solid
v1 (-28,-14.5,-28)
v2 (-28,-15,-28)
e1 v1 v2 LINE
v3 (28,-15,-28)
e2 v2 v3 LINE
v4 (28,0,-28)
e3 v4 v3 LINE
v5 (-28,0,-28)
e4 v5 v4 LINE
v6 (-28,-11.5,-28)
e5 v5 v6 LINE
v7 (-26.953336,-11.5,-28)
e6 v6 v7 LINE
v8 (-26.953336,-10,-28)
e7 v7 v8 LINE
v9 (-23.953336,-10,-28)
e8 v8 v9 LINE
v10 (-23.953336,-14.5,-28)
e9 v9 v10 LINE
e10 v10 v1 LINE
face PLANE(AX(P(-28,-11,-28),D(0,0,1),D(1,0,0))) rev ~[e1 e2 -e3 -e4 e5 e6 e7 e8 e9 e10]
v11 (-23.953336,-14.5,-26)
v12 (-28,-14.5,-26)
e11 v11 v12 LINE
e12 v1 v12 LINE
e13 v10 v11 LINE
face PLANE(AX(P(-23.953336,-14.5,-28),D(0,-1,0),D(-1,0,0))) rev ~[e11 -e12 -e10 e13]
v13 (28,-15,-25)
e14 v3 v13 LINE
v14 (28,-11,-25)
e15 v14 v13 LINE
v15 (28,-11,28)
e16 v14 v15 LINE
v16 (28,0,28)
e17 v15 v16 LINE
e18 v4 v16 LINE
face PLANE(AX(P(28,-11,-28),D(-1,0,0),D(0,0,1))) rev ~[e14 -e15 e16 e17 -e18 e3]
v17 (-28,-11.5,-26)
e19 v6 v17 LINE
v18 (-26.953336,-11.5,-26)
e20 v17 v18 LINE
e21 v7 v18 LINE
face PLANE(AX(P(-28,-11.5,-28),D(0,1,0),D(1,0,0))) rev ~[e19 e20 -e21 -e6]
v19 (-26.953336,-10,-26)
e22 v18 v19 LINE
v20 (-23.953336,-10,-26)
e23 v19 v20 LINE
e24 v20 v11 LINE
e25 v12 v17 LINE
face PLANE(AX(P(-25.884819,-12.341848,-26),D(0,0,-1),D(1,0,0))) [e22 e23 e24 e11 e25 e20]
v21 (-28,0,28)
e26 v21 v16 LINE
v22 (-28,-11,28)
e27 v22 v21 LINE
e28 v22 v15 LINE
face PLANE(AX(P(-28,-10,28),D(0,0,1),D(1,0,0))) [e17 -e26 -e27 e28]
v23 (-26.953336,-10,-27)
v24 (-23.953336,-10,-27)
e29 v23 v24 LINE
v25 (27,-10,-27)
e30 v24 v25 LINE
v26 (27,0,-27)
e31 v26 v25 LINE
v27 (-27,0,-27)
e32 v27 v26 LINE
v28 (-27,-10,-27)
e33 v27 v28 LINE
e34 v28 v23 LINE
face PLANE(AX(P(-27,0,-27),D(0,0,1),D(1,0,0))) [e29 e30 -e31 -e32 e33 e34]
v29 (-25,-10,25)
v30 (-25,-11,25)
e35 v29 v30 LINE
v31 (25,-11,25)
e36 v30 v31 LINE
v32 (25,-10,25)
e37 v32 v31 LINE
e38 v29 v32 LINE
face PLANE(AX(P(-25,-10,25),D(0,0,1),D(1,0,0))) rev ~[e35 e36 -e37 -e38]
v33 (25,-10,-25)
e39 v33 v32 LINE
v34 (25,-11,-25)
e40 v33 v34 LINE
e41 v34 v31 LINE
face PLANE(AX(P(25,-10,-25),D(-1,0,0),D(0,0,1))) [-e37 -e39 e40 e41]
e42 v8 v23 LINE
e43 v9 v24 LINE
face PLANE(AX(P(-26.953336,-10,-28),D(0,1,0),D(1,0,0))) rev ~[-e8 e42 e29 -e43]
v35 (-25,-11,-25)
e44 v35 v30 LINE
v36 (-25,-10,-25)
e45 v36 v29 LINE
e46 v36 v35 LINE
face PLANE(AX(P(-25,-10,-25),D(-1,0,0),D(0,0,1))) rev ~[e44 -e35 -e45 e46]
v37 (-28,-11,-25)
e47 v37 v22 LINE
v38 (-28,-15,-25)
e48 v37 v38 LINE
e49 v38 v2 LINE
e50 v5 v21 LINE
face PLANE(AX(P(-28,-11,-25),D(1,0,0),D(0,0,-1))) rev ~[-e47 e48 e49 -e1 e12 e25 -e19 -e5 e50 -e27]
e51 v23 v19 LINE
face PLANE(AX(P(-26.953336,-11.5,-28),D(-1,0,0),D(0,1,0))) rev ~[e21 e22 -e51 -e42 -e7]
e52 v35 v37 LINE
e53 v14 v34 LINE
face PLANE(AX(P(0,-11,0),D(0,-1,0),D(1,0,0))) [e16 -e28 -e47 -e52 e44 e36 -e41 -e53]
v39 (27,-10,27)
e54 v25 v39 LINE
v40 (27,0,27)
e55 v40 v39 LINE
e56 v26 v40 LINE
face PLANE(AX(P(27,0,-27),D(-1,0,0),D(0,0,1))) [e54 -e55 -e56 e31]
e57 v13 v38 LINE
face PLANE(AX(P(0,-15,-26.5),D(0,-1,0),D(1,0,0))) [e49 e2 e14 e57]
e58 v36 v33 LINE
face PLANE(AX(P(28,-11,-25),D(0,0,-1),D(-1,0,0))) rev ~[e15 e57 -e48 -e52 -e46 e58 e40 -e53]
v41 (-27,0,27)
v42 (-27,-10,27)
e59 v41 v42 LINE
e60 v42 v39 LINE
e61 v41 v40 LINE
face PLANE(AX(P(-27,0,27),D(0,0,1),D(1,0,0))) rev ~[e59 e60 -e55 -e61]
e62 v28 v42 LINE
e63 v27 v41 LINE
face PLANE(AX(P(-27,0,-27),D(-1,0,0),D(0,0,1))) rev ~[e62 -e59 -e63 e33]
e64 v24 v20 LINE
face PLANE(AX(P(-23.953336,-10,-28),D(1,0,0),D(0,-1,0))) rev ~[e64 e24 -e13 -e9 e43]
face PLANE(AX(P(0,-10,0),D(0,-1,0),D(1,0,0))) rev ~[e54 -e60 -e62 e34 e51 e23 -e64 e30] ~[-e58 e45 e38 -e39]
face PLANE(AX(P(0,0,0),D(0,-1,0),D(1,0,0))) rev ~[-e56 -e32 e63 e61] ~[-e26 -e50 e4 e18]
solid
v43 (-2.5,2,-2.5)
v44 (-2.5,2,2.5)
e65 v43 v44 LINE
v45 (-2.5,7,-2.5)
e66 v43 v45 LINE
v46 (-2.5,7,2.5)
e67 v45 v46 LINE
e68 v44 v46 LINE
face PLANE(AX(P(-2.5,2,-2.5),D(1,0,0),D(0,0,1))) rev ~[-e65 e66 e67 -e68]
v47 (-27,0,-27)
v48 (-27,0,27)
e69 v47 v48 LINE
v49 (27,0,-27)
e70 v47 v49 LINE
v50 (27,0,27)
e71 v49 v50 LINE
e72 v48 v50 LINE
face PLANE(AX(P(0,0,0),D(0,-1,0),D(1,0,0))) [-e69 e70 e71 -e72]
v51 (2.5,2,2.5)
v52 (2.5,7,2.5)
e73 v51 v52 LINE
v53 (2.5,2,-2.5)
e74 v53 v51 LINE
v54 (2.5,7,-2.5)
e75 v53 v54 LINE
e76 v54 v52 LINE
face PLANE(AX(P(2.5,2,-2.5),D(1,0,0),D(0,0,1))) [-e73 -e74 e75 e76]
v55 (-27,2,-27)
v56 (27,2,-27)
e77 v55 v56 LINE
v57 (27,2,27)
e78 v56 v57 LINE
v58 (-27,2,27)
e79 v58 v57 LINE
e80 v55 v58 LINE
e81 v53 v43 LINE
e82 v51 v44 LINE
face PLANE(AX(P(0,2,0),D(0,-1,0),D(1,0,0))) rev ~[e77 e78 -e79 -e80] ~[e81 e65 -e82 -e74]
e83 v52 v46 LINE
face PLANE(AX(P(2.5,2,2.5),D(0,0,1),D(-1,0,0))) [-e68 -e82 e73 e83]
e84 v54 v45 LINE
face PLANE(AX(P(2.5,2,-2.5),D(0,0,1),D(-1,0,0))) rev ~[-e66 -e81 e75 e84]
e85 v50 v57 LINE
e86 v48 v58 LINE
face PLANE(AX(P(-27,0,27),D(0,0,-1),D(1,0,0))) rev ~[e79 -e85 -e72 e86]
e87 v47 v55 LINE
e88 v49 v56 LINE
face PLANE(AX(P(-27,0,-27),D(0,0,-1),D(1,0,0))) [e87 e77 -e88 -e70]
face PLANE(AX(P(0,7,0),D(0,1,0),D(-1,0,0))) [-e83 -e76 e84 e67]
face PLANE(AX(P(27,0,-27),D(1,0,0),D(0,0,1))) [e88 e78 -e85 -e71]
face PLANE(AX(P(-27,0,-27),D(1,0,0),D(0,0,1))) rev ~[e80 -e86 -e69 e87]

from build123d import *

# Parameters (mm, degrees)
F0_W      = 56
F0_H      = 56
F0_W_2    = 54
F0_H_2    = 54
F1_DEPTH  = 10
F2_W      = 56
F2_H      = 56
F2_W_2    = 54
F2_H_2    = 54
F2_W_3    = 50
F2_H_3    = 50
F3_DEPTH  = 1
F4_DEPTH  = 2
F5_W      = 5
F5_H      = 5
F6_DEPTH  = 5
F8_DEPTH  = 4
F10_DEPTH = 2


# Not quite as in the source:
# - a feature of the source that left no trace in its solid (it failed there, or was rolled back) is left out


with BuildPart() as f1:
    # F0 (on Front) → F1 (new body)
    with BuildSketch(Plane.XZ):
        Rectangle(F0_W, F0_H)
        Rectangle(F0_W_2, F0_H_2, mode=Mode.SUBTRACT)
    extrude(amount=F1_DEPTH)

    # F2 (on face) → F3 (join)
    with BuildSketch(Plane.XZ.offset(10)):
        Rectangle(F2_W, F2_H)
        Rectangle(F2_W_2, F2_H_2, mode=Mode.SUBTRACT)
        Rectangle(F2_W_2, F2_H_2)
        Rectangle(F2_W_3, F2_H_3, mode=Mode.SUBTRACT)
    extrude(amount=F3_DEPTH)

    # F7 (on face) → F8 (join)
    with BuildSketch(Plane.XZ.offset(11)):
        Polygon((-28, -25), (-28, -28), (28, -28), (28, -25), (25, -25), (-25, -25), align=None)
    extrude(amount=F8_DEPTH)

    # F9 (on face) → F10 (cut)
    with BuildSketch(Plane(origin=(0, 0, -28), x_dir=(1, 0, 0), z_dir=(0, 0, -1))):
        Polygon((-26.9533358514, 10), (-23.9533358514, 10), (-23.9533358514, 14.5), (-28, 14.5), (-28, 11.5), (-26.9533358514, 11.5), align=None)
    extrude(amount=-F10_DEPTH, mode=Mode.SUBTRACT)


with BuildPart() as f4:
    # F0 (on Front) → F4 (new body)
    with BuildSketch(Plane.XZ):
        Rectangle(F0_W_2, F0_H_2)
    extrude(amount=-F4_DEPTH)

    # F5 (on face) → F6 (join)
    with BuildSketch(Plane(origin=(0, 2, 0), x_dir=(-1, 0, 0), z_dir=(0, 1, 0))):
        Rectangle(F5_W, F5_H)
    extrude(amount=F6_DEPTH)


solid = Compound([f1.part, f4.part])
